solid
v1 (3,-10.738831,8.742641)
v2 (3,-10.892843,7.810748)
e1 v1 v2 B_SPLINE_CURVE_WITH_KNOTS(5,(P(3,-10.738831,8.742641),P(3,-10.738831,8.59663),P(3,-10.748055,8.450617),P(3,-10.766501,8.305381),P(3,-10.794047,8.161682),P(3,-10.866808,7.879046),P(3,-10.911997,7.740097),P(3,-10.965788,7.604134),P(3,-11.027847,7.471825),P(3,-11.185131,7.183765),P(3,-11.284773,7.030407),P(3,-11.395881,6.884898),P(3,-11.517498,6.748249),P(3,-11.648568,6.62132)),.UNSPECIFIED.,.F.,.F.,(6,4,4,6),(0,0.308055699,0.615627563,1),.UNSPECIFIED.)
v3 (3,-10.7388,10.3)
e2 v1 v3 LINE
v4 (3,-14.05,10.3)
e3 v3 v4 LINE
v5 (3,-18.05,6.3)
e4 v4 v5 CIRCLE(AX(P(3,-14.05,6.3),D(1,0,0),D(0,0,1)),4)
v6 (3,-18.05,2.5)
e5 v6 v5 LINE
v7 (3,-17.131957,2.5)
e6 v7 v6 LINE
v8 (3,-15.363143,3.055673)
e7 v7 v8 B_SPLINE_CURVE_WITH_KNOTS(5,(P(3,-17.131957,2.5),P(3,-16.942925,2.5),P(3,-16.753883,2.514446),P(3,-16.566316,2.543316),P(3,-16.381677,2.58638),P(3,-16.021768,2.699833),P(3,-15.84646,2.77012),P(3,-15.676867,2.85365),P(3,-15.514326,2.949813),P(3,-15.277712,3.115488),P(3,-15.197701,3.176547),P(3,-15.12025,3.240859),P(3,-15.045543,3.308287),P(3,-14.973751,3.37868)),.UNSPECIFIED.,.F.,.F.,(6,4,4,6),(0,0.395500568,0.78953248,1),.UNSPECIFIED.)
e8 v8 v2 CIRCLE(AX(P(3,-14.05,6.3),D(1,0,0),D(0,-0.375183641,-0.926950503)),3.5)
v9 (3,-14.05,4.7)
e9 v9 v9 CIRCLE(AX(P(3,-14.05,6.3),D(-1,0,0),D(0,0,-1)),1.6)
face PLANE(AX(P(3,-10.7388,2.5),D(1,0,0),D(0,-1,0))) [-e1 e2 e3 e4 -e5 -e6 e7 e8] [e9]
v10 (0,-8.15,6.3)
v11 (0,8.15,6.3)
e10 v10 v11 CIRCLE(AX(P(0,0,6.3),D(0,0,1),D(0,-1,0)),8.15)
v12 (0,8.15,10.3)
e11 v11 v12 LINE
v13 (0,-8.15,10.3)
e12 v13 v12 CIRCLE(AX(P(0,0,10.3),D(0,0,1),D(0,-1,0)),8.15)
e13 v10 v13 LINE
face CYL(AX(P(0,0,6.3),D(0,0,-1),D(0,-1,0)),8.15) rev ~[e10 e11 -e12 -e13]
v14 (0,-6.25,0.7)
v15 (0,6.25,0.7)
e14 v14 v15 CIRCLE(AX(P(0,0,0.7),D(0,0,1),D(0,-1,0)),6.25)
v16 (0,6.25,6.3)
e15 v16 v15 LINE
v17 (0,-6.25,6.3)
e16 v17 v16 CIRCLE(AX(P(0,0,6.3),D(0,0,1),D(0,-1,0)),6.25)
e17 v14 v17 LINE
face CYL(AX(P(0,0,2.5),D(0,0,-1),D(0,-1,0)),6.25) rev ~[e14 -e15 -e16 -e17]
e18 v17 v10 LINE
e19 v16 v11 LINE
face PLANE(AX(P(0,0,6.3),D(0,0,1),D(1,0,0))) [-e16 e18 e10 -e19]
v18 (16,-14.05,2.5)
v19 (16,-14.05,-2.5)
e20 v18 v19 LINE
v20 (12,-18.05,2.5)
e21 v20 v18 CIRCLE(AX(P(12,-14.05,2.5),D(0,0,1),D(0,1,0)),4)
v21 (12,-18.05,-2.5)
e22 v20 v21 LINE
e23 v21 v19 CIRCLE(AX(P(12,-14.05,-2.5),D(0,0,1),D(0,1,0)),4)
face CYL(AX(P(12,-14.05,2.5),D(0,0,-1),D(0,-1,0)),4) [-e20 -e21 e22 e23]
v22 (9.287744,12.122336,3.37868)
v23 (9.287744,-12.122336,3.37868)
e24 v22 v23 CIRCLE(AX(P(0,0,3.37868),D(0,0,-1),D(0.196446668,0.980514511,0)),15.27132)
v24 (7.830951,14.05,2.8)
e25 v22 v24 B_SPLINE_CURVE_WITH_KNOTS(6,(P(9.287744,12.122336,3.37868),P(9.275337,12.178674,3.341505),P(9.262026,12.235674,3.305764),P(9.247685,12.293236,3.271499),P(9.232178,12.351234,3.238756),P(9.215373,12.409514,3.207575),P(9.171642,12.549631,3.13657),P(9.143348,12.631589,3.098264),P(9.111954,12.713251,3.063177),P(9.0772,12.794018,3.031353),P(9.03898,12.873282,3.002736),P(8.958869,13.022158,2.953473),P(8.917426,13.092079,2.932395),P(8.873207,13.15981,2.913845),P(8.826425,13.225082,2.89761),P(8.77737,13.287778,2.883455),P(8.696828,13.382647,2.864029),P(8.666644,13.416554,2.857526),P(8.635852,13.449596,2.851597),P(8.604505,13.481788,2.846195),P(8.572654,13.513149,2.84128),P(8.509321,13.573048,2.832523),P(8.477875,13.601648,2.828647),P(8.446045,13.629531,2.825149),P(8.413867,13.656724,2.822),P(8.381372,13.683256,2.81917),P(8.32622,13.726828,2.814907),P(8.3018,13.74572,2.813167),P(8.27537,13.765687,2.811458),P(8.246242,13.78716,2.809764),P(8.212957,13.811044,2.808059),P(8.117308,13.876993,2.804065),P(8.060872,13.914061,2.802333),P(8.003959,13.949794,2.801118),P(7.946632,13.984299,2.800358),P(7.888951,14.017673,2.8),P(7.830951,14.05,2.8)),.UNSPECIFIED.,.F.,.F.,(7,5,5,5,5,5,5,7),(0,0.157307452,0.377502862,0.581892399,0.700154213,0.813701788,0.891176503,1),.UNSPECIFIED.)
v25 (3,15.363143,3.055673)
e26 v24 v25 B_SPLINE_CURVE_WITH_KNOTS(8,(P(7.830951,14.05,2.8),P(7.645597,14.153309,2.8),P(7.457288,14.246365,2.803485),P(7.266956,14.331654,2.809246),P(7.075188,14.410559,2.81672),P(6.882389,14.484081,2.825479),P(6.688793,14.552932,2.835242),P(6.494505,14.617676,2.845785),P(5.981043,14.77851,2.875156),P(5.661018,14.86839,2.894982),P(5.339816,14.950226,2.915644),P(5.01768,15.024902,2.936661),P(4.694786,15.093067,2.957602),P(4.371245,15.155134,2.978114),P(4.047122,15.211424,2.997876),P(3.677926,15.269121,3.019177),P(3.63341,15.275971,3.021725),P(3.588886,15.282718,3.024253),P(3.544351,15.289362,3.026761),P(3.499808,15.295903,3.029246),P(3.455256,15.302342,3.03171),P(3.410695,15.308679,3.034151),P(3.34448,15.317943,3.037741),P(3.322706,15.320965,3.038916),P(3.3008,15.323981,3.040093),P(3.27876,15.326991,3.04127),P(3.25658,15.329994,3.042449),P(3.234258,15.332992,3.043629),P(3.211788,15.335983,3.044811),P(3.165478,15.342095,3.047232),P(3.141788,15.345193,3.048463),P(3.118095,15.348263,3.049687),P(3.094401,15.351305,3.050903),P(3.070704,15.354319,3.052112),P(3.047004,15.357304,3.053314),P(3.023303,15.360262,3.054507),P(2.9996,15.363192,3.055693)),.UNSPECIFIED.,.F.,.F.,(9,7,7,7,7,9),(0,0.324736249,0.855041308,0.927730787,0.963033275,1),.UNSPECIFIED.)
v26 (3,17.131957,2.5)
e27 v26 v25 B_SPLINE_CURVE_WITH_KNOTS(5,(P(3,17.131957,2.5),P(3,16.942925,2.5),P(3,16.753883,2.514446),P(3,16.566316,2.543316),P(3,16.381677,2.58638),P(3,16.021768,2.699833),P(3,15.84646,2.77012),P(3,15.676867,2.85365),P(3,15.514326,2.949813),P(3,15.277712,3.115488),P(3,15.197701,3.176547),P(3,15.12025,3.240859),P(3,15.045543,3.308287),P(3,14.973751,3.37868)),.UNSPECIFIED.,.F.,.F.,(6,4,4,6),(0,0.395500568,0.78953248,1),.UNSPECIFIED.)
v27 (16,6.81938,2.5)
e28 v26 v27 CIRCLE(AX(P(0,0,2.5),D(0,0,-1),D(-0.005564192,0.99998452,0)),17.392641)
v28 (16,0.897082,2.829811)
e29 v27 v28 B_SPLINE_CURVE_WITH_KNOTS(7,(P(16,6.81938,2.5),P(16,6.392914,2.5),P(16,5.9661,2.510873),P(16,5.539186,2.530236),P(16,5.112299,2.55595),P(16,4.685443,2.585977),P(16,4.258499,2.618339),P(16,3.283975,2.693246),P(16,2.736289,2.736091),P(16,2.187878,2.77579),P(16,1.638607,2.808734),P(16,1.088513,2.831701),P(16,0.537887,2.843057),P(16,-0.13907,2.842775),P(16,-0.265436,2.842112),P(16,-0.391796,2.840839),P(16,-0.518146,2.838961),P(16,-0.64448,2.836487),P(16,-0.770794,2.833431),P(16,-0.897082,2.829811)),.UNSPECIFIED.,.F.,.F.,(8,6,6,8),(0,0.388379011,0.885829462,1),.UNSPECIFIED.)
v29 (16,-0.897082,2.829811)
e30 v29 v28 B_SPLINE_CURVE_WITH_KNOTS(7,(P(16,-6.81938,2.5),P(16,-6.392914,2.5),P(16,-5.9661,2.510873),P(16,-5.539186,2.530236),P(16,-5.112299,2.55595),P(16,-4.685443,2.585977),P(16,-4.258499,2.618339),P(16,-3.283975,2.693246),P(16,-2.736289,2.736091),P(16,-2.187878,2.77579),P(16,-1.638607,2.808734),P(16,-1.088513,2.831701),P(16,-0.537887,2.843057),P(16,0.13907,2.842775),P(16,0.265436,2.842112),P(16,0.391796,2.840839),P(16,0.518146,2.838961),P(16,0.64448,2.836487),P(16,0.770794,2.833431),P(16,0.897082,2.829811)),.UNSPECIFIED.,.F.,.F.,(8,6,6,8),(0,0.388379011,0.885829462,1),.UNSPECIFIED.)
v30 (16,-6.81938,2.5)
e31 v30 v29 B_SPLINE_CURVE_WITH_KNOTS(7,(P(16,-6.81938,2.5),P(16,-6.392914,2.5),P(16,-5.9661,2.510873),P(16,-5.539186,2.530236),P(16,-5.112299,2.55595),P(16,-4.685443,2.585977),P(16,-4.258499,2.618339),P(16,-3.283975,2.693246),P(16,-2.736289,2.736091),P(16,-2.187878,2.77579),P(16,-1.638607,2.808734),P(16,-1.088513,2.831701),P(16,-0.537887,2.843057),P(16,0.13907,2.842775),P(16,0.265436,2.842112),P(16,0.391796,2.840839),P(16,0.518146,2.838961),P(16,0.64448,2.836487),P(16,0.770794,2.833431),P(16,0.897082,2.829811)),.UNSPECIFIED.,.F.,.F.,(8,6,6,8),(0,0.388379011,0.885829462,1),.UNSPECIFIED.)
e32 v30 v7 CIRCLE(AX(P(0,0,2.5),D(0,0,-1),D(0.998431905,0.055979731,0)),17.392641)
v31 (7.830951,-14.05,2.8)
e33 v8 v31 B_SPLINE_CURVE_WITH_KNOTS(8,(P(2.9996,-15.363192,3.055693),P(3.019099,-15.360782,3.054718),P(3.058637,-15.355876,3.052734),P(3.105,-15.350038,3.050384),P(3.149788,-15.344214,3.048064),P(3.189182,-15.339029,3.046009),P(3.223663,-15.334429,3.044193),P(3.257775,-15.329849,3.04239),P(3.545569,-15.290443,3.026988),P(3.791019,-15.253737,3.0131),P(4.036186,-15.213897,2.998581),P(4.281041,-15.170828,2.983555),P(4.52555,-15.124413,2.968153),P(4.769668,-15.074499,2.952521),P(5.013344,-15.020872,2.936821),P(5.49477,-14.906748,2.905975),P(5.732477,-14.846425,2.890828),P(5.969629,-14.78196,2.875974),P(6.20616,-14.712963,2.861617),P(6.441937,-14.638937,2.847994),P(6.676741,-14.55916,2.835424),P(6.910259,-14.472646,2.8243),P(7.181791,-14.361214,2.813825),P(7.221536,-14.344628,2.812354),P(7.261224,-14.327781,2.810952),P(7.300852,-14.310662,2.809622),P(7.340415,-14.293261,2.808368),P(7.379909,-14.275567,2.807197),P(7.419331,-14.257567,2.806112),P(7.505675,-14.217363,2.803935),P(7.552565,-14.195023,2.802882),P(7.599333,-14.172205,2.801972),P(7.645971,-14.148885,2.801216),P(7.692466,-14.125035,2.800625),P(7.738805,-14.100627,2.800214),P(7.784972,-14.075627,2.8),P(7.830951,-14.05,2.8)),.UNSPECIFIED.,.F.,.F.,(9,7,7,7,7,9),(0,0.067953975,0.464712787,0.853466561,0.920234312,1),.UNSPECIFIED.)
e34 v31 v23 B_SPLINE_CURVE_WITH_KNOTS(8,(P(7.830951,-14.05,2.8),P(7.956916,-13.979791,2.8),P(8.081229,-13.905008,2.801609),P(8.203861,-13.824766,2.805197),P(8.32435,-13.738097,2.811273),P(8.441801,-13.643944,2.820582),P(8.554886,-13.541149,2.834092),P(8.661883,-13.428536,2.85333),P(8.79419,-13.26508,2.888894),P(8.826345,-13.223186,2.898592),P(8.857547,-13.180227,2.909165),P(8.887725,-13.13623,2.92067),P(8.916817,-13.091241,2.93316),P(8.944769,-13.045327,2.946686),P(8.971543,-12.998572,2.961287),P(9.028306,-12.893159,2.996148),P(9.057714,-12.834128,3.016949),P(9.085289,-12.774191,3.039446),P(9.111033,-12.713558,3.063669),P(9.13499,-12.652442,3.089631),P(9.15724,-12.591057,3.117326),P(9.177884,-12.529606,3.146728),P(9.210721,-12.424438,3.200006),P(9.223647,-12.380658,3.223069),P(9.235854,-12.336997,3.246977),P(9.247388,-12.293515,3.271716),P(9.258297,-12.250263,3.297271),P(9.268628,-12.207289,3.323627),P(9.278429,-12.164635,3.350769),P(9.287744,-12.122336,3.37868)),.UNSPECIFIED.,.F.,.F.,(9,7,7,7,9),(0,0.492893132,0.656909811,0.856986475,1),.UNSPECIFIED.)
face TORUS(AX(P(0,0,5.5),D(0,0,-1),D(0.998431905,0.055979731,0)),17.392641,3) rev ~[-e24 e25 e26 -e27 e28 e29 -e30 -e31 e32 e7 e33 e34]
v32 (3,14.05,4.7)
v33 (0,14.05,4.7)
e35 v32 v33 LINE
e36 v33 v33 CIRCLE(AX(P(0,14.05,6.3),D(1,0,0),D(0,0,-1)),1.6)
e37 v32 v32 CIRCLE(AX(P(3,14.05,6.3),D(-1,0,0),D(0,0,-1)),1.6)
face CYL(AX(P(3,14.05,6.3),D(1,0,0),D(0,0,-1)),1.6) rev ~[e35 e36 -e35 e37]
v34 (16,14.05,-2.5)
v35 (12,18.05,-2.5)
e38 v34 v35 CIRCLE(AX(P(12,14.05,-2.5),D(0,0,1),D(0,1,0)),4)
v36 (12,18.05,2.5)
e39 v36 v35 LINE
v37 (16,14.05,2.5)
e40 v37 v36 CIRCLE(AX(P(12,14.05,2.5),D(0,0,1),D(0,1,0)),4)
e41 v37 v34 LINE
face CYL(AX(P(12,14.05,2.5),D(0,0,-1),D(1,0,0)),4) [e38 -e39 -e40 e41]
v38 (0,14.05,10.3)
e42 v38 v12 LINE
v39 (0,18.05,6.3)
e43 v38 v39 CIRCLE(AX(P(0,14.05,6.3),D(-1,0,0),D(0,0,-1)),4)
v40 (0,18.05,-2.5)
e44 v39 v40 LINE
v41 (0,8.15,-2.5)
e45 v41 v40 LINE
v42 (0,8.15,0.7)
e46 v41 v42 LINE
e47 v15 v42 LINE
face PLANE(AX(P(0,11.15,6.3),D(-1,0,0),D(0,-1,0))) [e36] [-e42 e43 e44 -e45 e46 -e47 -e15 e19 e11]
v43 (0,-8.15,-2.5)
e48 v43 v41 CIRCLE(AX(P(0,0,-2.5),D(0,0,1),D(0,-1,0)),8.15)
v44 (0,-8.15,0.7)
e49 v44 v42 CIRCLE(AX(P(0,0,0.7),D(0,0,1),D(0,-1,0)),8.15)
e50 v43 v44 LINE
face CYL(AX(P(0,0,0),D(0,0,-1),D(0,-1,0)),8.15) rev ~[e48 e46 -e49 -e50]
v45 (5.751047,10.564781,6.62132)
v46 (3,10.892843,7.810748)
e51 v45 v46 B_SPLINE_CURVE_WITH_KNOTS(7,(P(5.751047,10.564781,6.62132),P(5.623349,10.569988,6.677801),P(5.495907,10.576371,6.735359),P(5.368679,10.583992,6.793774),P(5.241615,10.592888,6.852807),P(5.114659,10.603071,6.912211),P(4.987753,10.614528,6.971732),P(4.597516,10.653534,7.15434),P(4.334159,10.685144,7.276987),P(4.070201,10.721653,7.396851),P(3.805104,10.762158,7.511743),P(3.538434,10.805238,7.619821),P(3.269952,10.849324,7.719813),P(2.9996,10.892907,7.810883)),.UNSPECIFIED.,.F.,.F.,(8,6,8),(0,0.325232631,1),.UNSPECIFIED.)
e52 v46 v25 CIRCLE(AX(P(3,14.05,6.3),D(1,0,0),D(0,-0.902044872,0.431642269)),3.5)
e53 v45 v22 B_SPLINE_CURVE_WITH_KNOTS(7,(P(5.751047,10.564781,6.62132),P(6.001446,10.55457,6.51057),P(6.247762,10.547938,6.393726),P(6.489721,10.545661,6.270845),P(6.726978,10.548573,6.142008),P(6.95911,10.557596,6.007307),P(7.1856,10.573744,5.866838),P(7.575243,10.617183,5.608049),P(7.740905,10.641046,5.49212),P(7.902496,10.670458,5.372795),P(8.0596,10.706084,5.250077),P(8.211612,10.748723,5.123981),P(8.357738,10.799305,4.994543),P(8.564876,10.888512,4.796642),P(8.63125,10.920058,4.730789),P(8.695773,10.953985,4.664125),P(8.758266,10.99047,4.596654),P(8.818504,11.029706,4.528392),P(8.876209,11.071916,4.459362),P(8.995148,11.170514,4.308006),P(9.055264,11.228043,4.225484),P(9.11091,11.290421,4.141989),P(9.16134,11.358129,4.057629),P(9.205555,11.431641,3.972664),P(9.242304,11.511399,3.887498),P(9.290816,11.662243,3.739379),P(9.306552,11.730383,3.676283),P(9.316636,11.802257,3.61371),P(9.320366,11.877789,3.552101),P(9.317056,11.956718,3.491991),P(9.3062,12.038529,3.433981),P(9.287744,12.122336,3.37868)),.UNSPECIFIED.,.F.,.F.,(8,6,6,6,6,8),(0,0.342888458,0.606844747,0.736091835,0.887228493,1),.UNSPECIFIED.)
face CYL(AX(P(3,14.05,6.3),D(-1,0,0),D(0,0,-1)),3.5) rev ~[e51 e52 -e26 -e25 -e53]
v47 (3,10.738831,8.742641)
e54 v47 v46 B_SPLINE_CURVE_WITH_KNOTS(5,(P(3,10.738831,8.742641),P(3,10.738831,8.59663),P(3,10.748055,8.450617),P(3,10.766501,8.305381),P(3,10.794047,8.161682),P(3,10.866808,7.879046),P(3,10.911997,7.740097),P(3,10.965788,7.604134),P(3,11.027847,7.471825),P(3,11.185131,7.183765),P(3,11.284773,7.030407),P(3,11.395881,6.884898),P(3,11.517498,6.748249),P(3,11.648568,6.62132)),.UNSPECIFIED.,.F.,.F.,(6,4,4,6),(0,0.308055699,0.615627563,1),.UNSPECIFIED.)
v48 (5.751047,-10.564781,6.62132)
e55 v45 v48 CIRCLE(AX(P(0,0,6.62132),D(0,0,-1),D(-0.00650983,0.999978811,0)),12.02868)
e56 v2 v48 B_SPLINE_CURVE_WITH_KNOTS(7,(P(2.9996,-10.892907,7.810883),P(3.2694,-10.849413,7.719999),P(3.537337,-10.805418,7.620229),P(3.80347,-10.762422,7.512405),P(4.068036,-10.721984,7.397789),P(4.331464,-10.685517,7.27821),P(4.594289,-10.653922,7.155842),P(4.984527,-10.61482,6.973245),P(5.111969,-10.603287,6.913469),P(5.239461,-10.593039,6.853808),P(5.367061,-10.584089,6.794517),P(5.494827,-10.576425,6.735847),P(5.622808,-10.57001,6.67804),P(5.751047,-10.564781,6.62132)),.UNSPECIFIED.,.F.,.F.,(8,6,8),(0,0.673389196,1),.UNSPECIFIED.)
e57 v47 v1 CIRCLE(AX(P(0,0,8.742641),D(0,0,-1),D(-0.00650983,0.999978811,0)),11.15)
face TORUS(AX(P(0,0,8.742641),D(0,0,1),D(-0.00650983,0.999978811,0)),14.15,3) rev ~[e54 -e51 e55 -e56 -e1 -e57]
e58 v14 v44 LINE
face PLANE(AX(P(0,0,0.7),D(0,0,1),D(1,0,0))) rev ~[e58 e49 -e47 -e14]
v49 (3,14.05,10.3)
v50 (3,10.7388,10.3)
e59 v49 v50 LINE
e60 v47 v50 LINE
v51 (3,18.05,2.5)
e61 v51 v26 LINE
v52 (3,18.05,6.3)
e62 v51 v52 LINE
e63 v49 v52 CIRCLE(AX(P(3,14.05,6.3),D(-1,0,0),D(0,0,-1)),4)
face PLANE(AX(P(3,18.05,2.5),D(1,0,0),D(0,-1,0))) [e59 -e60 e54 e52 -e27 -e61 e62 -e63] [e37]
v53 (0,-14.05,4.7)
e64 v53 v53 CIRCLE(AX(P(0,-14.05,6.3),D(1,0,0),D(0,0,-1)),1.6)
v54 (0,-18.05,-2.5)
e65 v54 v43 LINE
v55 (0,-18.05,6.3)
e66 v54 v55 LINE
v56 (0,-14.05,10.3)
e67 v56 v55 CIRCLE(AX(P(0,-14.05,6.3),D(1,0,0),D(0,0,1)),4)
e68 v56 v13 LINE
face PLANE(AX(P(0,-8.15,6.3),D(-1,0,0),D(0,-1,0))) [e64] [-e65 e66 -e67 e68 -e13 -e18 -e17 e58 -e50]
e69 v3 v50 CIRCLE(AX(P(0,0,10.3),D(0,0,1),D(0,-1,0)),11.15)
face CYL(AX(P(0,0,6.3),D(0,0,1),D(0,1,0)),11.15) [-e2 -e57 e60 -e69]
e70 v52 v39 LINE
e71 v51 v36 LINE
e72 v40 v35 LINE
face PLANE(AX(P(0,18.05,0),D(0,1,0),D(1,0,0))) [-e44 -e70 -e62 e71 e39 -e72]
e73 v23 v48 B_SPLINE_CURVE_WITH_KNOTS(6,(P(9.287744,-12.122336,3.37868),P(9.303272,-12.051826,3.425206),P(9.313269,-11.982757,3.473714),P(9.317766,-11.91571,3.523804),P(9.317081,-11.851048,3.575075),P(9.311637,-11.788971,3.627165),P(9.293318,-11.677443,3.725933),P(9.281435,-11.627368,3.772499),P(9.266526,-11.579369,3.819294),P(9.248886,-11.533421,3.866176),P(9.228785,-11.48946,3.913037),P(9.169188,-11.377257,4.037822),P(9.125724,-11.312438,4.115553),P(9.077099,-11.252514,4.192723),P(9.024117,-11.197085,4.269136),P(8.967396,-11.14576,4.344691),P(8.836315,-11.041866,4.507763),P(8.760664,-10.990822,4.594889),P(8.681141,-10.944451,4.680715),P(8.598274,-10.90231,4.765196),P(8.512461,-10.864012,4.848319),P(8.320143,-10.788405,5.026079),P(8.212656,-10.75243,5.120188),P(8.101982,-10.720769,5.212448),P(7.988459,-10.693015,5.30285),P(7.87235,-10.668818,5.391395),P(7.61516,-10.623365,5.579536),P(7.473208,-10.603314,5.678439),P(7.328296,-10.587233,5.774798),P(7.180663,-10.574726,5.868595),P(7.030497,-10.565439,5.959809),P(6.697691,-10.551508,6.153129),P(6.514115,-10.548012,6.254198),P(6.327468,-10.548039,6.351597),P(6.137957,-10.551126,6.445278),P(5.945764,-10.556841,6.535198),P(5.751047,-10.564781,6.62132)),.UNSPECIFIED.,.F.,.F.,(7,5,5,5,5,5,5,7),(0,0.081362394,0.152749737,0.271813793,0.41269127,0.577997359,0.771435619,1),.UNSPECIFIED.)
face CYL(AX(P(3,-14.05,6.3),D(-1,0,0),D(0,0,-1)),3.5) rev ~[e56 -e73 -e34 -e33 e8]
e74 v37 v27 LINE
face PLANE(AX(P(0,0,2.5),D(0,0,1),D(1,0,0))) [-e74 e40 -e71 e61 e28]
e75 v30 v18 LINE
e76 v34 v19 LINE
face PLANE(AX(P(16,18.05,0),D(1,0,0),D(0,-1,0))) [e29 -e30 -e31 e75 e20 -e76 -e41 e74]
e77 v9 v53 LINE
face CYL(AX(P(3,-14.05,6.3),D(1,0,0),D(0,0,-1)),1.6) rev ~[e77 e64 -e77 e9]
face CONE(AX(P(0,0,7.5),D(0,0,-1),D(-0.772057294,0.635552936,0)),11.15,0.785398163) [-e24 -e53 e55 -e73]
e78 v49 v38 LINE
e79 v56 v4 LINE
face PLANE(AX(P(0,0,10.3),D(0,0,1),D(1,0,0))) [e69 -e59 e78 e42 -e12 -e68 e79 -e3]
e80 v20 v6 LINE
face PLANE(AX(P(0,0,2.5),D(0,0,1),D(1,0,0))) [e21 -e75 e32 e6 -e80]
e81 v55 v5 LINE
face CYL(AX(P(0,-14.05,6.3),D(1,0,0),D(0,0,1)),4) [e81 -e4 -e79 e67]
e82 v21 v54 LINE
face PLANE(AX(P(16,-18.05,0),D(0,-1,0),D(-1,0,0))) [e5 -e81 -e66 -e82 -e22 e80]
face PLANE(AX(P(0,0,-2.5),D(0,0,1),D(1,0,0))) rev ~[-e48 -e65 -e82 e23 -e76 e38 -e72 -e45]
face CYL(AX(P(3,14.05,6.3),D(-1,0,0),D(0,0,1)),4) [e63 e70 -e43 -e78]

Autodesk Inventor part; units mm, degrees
ref_plane "YZ Plane" through (0, 0, 0) normal (1, 0, 0) x (0, 1, 0)
ref_plane "XZ Plane" through (0, 0, 0) normal (0, 1, 0) x (-1, 0, 0)
ref_plane "XY Plane" through (0, 0, 0) normal (0, 0, 1) x (1, 0, 0)
sketch "Sketch1" plane through (0, 0, 0) normal (0, 0, 1) x (1, 0, 0)
  line L0 (0, 18.05) -> (16, 18.05)
  line L1 (16, 18.05) -> (16, -18.05)
  line L2 (16, -18.05) -> (0, -18.05)
  arc A0 (0, -8.15) -> (0, 8.15) centre (0, 0) ccw
  line L3 (0, -18.05) -> (0, -8.15)
  line L4 (0, 8.15) -> (0, 18.05)
  point P0 (16, 0)
  dimension "d0" = 16.3
  dimension "d1" = 36.1
  dimension "d3" = 16
extrude "Extrusion1" add sketch "Sketch1" along normal mid plane 5
sketch "Sketch2" plane through (0, 0, 2.5) normal (0, 0, 1) x (1, 0, 0)
  arc A0 (0, -6.25) -> (0, 6.25) centre (0, 0) ccw
  arc A1 (0, -8.15) -> (0, 8.15) centre (0, 0) ccw
  line L0 (0, 6.25) -> (0, 8.15)
  line L1 (0, -6.25) -> (0, -8.15)
  dimension "d6" = 12.5
extrude "Extrusion2" add sketch "Sketch2" along normal blind 3.8 and the other way blind 1.8
sketch "Sketch3" plane through (0, 0, 6.3) normal (0, 0, 1) x (1, 0, 0)
  arc A0 (0, -8.15) -> (0, 8.15) centre (0, 0) ccw projected
  arc A1 (0, -11.15) -> (0, 11.15) centre (0, 0) ccw
  line L0 (0, -8.15) -> (0, -11.15)
  line L1 (0, 8.15) -> (0, 11.15)
  dimension "d11" = 3
extrude "Extrusion3" add sketch "Sketch3" along normal blind 4
sketch "Sketch4" plane through (0, 0, 6.3) normal (0, 0, -1) x (-1, 0, 0)
  arc A0 (0, 8.15) -> (0, -8.15) centre (0, 0) ccw projected
  line L0 (0, 11.15) -> (0, 8.15) projected
  arc A1 (0, 11.15) -> (0, -11.15) centre (0, 0) ccw projected
  line L1 (0, -8.15) -> (0, -11.15) projected
extrude "Extrusion4" add sketch "Sketch4" along normal up to surface (3.8 mm away)
sketch "Sketch5" plane through (0, 0, 2.5) normal (0, 0, 1) x (1, 0, 0)
  arc A0 (0, -11.15) -> (0, 11.15) centre (0, 0) ccw projected
  line L0 (16, 18.05) -> (0, 18.05) projected
  line L1 (3, 18.05) -> (3, 10.7388)
  arc A1 (0, -11.15) -> (0, 11.15) centre (0, 0) ccw projected
  line L2 (3, -10.7388) -> (3, -18.05)
  line L3 (0, -18.05) -> (16, -18.05) projected
  line L4 (0, 18.05) -> (0, 11.15) projected
  line L5 (0, -11.15) -> (0, -18.05) projected
  dimension "d16" = 3
extrude "Extrusion5" add sketch "Sketch5" along normal up to surface (7.8 mm away)
chamfer "Chamfer1" distance 5 angle 45 1 edges at (11.15, 0, 2.5)
fillet "Fillet1" radius 3 3 edges at (11.7041, -11.1281, 2.5) (11.15, 0, 7.5) (11.7041, 11.1281, 2.5)
sketch "Sketch6" plane through (3, -18.05, 2.5) normal (1, 0, 0) x (0, 0, -1)
  circle A0 centre (-3.8, 32.1) radius 1.6
  circle A1 centre (-3.8, 4) radius 1.6
  line L0 (0, 0) -> (-7.8, 0) projected
  line L1 (-7.8, 7.3112) -> (-7.8, 0) projected
  line L2 (0, 36.1) -> (-7.8, 36.1) projected
  point P0 (2.5, 18.05)
  dimension "d19" = 3.2
  dimension "d20" = 4
  dimension "d21" = 4
  dimension "d22" = 4
extrude "Extrusion6" cut sketch "Sketch6" against normal up to next
fillet "Fillet2" radius 4 2 edges at (1.5, -18.05, 10.3) (1.5, 18.05, 10.3)
fillet "Fillet3" radius 4 2 edges at (16, -18.05, 0) (16, 18.05, 0)
sketch "Sketch7" plane through (3, -18.05, 2.5) normal (1, 0, 0) x (0, 0, -1)
  arc A0 (-3.2482, 5.5018) -> (-2.2844, 4.5129) centre (-3.8, 4) ccw projected
  arc A1 (-2.2844, 31.5871) -> (-3.2482, 30.5982) centre (-3.8, 32.1) ccw projected
  circle A2 centre (-3.8, 4) radius 3.5
  circle A3 centre (-3.8, 32.1) radius 3.5
  point P0 (2.5, 18.05)
  dimension "d31" = 7
extrude "Extrusion7" cut sketch "Sketch7" along normal through all
properties part number "x-carriage-holder"
